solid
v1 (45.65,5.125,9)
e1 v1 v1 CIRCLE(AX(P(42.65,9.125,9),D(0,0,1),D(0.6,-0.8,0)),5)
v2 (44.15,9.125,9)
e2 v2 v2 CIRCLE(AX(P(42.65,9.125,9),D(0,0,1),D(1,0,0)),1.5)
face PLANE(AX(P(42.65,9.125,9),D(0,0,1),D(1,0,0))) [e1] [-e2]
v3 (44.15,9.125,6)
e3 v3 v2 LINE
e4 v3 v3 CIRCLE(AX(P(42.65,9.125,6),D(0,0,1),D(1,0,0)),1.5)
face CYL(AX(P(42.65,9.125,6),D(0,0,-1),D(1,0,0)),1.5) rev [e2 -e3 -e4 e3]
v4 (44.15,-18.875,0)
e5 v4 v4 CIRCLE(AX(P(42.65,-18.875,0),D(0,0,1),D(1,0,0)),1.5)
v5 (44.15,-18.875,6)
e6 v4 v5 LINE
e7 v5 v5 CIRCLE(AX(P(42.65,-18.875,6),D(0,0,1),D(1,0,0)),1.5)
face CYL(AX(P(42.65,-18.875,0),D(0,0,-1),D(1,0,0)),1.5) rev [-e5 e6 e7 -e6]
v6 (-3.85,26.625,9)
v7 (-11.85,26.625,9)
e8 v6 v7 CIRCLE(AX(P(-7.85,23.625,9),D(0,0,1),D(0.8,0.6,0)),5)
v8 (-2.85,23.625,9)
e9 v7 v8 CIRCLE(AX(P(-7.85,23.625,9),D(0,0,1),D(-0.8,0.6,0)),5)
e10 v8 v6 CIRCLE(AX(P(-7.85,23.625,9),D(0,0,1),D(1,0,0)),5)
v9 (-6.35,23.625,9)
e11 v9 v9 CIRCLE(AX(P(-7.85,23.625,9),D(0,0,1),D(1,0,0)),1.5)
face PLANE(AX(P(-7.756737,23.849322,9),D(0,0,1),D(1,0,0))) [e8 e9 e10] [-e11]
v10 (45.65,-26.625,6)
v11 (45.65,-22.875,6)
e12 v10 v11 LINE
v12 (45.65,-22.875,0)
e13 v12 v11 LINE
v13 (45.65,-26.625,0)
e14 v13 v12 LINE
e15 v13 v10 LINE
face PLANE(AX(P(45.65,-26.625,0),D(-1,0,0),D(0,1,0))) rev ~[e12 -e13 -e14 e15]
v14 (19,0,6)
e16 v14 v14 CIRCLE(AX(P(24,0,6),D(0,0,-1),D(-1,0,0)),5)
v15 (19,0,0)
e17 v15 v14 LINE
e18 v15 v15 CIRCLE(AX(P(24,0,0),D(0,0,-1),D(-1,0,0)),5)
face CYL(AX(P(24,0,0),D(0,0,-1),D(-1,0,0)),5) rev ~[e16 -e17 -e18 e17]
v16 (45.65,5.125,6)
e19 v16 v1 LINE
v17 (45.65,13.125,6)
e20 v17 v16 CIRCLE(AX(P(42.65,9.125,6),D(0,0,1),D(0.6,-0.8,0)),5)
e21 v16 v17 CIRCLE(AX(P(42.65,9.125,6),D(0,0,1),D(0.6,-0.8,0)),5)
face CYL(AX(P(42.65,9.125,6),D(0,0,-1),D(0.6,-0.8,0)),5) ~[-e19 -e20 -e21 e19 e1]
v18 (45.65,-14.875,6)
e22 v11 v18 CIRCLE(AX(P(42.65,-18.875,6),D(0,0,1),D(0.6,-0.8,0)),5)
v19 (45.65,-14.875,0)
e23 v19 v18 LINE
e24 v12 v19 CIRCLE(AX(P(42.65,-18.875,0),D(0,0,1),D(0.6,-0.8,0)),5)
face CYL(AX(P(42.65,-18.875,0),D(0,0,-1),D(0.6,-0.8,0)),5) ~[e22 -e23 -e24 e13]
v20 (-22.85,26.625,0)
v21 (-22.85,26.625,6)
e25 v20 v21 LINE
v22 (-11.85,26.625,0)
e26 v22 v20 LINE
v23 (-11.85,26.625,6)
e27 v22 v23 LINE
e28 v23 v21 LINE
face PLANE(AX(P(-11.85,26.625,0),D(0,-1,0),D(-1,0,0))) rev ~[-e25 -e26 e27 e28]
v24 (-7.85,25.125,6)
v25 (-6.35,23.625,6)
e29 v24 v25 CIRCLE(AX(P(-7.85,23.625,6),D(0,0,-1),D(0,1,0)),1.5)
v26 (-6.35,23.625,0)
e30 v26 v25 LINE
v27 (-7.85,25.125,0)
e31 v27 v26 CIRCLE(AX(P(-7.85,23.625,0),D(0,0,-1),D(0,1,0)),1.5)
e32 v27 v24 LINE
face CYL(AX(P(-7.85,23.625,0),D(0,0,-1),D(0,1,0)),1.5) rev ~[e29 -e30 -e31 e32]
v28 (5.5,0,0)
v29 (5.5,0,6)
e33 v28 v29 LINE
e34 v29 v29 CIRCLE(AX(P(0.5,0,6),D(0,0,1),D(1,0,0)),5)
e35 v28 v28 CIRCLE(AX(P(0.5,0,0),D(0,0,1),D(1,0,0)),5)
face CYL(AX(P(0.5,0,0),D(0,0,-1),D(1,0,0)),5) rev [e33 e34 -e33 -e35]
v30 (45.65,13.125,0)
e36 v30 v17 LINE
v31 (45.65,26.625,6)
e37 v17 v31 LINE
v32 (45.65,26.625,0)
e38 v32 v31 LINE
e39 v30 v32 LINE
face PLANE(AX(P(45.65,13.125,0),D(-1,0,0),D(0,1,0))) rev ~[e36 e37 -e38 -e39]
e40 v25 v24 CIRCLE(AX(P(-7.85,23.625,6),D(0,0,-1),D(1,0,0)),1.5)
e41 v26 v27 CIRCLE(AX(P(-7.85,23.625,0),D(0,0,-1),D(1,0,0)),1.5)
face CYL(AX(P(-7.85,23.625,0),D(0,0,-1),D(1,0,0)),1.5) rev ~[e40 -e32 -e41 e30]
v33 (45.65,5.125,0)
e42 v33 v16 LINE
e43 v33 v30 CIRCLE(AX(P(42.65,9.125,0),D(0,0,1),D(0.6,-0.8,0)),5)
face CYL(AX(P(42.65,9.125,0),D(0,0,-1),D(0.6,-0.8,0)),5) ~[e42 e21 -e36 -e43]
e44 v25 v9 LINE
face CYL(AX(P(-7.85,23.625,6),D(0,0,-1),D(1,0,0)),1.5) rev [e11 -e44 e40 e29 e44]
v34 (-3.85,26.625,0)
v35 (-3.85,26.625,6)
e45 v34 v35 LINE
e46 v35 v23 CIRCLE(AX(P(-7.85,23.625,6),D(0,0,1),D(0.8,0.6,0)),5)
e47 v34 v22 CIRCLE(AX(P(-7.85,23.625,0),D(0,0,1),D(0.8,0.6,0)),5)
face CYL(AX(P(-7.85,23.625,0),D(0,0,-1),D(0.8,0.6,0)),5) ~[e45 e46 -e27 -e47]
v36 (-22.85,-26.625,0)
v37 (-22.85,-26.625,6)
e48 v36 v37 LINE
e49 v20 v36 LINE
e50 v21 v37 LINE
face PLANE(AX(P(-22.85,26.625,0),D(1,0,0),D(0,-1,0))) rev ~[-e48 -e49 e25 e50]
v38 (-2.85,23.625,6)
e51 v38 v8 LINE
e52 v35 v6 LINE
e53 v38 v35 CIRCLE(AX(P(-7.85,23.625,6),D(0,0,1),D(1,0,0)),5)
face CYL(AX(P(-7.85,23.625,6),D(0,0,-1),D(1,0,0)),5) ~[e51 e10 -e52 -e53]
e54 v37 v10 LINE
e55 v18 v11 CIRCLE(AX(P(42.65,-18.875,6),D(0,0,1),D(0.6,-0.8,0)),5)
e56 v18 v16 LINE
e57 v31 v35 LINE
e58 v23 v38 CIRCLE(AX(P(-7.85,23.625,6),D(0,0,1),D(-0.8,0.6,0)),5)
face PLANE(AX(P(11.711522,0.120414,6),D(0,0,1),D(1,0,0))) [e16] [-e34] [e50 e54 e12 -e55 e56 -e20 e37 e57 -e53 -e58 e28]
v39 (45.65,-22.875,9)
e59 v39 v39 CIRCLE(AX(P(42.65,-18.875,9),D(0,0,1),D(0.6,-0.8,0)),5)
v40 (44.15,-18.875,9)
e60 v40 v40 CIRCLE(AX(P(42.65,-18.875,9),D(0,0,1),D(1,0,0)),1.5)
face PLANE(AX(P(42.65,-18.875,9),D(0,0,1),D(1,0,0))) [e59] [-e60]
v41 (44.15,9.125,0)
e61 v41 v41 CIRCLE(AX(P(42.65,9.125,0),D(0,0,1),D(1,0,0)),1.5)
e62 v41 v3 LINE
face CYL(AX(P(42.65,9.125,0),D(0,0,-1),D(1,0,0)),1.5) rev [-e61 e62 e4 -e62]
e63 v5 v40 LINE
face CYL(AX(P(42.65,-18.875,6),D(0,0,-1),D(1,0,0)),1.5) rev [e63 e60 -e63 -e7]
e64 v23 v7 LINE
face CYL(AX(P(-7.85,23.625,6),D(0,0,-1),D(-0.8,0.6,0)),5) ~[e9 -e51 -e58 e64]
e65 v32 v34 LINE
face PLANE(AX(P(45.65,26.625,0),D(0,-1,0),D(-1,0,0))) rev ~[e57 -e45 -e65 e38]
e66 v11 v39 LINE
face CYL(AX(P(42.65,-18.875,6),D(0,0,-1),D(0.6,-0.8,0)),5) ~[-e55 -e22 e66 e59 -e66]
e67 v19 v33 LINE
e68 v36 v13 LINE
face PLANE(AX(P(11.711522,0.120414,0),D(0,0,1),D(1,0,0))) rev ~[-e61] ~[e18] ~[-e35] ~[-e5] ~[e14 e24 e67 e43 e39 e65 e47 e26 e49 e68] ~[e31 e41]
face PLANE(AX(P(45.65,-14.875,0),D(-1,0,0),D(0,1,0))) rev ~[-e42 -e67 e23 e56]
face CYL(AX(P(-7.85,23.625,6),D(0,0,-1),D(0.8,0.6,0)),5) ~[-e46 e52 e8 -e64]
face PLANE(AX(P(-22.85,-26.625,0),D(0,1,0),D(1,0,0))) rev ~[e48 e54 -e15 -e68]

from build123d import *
from build123d import SkipClean  # not in build123d's __all__

# Parameters (mm, degrees)
F0_R     = 5
F0_R_2   = 1.5
F1_DEPTH = 6
F2_R     = 1.5
F3_DEPTH = 3


# Not quite as in the source:
# - a feature names something its author has since deleted; it is built from what else it names


with BuildPart() as f1:
    # F0 (on Top) → F1 (new body)
    with BuildSketch(Plane.XY):
        with BuildLine():
            Line((42.65, 26.625), (11.4, 26.625))
            Line((11.4, 26.625), (-3.85, 26.625))
            ThreePointArc((-3.85, 26.625), (-7.85, 28.625), (-11.85, 26.625))
            Line((-11.85, 26.625), (-22.85, 26.625))
            Line((-22.85, 26.625), (-22.85, -26.625))
            Line((-22.85, -26.625), (45.65, -26.625))
            Line((45.65, -26.625), (45.65, -22.875))
            ThreePointArc((45.65, -22.875), (47.65, -18.875), (45.65, -14.875))
            Line((45.65, -14.875), (45.65, 5.125))
            ThreePointArc((45.65, 5.125), (47.65, 9.125), (45.65, 13.125))
            Line((45.65, 13.125), (45.65, 26.625))
            Line((45.65, 26.625), (42.65, 26.625))
        make_face()
        with Locations((0.5, 0)):
            Circle(F0_R, mode=Mode.SUBTRACT)
        with Locations((42.65, -18.875)):
            Circle(F0_R_2, mode=Mode.SUBTRACT)
        with BuildLine():
            ThreePointArc((29, 0), (24, -5), (19, 0))
            ThreePointArc((19, 0), (24, 5), (29, 0))
        make_face(mode=Mode.SUBTRACT)
        with BuildLine():
            ThreePointArc((-7.85, 25.125), (-6.7893398282, 24.6856601718), (-6.35, 23.625))
            ThreePointArc((-6.35, 23.625), (-8.9106601718, 22.5643398282), (-7.85, 25.125))
        make_face(mode=Mode.SUBTRACT)
        with Locations((42.65, 9.125)):
            Circle(F0_R_2, mode=Mode.SUBTRACT)
    extrude(amount=F1_DEPTH)

    # F2 (on face) → F3 (join)
    with BuildSketch(Plane.XY.offset(6)):
        with BuildLine():
            ThreePointArc((-11.85, 26.625), (-9.4311388301, 18.8815835097), (-2.85, 23.625))
            ThreePointArc((-2.85, 23.625), (-3.1065835097, 25.2061388301), (-3.85, 26.625))
            ThreePointArc((-3.85, 26.625), (-7.85, 28.625), (-11.85, 26.625))
        make_face()
        with Locations((-7.85, 23.625)):
            Circle(F2_R, mode=Mode.SUBTRACT)
        with BuildLine():
            ThreePointArc((47.65, 9.125), (47.122135955, 11.3610679775), (45.65, 13.125))
            ThreePointArc((45.65, 13.125), (37.65, 9.125), (45.65, 5.125))
            ThreePointArc((45.65, 5.125), (47.122135955, 6.8889320225), (47.65, 9.125))
        make_face()
        with Locations((42.65, 9.125)):
            Circle(F2_R, mode=Mode.SUBTRACT)
        with BuildLine():
            ThreePointArc((47.65, -18.875), (47.122135955, -16.6389320225), (45.65, -14.875))
            ThreePointArc((45.65, -14.875), (37.65, -18.875), (45.65, -22.875))
            ThreePointArc((45.65, -22.875), (47.122135955, -21.1110679775), (47.65, -18.875))
        make_face()
        with Locations((42.65, -18.875)):
            Circle(F2_R, mode=Mode.SUBTRACT)
    with SkipClean():  # cleaning this boolean's faces spoils the solid; the shape is the same uncleaned
        extrude(amount=F3_DEPTH)


solid = f1.part
